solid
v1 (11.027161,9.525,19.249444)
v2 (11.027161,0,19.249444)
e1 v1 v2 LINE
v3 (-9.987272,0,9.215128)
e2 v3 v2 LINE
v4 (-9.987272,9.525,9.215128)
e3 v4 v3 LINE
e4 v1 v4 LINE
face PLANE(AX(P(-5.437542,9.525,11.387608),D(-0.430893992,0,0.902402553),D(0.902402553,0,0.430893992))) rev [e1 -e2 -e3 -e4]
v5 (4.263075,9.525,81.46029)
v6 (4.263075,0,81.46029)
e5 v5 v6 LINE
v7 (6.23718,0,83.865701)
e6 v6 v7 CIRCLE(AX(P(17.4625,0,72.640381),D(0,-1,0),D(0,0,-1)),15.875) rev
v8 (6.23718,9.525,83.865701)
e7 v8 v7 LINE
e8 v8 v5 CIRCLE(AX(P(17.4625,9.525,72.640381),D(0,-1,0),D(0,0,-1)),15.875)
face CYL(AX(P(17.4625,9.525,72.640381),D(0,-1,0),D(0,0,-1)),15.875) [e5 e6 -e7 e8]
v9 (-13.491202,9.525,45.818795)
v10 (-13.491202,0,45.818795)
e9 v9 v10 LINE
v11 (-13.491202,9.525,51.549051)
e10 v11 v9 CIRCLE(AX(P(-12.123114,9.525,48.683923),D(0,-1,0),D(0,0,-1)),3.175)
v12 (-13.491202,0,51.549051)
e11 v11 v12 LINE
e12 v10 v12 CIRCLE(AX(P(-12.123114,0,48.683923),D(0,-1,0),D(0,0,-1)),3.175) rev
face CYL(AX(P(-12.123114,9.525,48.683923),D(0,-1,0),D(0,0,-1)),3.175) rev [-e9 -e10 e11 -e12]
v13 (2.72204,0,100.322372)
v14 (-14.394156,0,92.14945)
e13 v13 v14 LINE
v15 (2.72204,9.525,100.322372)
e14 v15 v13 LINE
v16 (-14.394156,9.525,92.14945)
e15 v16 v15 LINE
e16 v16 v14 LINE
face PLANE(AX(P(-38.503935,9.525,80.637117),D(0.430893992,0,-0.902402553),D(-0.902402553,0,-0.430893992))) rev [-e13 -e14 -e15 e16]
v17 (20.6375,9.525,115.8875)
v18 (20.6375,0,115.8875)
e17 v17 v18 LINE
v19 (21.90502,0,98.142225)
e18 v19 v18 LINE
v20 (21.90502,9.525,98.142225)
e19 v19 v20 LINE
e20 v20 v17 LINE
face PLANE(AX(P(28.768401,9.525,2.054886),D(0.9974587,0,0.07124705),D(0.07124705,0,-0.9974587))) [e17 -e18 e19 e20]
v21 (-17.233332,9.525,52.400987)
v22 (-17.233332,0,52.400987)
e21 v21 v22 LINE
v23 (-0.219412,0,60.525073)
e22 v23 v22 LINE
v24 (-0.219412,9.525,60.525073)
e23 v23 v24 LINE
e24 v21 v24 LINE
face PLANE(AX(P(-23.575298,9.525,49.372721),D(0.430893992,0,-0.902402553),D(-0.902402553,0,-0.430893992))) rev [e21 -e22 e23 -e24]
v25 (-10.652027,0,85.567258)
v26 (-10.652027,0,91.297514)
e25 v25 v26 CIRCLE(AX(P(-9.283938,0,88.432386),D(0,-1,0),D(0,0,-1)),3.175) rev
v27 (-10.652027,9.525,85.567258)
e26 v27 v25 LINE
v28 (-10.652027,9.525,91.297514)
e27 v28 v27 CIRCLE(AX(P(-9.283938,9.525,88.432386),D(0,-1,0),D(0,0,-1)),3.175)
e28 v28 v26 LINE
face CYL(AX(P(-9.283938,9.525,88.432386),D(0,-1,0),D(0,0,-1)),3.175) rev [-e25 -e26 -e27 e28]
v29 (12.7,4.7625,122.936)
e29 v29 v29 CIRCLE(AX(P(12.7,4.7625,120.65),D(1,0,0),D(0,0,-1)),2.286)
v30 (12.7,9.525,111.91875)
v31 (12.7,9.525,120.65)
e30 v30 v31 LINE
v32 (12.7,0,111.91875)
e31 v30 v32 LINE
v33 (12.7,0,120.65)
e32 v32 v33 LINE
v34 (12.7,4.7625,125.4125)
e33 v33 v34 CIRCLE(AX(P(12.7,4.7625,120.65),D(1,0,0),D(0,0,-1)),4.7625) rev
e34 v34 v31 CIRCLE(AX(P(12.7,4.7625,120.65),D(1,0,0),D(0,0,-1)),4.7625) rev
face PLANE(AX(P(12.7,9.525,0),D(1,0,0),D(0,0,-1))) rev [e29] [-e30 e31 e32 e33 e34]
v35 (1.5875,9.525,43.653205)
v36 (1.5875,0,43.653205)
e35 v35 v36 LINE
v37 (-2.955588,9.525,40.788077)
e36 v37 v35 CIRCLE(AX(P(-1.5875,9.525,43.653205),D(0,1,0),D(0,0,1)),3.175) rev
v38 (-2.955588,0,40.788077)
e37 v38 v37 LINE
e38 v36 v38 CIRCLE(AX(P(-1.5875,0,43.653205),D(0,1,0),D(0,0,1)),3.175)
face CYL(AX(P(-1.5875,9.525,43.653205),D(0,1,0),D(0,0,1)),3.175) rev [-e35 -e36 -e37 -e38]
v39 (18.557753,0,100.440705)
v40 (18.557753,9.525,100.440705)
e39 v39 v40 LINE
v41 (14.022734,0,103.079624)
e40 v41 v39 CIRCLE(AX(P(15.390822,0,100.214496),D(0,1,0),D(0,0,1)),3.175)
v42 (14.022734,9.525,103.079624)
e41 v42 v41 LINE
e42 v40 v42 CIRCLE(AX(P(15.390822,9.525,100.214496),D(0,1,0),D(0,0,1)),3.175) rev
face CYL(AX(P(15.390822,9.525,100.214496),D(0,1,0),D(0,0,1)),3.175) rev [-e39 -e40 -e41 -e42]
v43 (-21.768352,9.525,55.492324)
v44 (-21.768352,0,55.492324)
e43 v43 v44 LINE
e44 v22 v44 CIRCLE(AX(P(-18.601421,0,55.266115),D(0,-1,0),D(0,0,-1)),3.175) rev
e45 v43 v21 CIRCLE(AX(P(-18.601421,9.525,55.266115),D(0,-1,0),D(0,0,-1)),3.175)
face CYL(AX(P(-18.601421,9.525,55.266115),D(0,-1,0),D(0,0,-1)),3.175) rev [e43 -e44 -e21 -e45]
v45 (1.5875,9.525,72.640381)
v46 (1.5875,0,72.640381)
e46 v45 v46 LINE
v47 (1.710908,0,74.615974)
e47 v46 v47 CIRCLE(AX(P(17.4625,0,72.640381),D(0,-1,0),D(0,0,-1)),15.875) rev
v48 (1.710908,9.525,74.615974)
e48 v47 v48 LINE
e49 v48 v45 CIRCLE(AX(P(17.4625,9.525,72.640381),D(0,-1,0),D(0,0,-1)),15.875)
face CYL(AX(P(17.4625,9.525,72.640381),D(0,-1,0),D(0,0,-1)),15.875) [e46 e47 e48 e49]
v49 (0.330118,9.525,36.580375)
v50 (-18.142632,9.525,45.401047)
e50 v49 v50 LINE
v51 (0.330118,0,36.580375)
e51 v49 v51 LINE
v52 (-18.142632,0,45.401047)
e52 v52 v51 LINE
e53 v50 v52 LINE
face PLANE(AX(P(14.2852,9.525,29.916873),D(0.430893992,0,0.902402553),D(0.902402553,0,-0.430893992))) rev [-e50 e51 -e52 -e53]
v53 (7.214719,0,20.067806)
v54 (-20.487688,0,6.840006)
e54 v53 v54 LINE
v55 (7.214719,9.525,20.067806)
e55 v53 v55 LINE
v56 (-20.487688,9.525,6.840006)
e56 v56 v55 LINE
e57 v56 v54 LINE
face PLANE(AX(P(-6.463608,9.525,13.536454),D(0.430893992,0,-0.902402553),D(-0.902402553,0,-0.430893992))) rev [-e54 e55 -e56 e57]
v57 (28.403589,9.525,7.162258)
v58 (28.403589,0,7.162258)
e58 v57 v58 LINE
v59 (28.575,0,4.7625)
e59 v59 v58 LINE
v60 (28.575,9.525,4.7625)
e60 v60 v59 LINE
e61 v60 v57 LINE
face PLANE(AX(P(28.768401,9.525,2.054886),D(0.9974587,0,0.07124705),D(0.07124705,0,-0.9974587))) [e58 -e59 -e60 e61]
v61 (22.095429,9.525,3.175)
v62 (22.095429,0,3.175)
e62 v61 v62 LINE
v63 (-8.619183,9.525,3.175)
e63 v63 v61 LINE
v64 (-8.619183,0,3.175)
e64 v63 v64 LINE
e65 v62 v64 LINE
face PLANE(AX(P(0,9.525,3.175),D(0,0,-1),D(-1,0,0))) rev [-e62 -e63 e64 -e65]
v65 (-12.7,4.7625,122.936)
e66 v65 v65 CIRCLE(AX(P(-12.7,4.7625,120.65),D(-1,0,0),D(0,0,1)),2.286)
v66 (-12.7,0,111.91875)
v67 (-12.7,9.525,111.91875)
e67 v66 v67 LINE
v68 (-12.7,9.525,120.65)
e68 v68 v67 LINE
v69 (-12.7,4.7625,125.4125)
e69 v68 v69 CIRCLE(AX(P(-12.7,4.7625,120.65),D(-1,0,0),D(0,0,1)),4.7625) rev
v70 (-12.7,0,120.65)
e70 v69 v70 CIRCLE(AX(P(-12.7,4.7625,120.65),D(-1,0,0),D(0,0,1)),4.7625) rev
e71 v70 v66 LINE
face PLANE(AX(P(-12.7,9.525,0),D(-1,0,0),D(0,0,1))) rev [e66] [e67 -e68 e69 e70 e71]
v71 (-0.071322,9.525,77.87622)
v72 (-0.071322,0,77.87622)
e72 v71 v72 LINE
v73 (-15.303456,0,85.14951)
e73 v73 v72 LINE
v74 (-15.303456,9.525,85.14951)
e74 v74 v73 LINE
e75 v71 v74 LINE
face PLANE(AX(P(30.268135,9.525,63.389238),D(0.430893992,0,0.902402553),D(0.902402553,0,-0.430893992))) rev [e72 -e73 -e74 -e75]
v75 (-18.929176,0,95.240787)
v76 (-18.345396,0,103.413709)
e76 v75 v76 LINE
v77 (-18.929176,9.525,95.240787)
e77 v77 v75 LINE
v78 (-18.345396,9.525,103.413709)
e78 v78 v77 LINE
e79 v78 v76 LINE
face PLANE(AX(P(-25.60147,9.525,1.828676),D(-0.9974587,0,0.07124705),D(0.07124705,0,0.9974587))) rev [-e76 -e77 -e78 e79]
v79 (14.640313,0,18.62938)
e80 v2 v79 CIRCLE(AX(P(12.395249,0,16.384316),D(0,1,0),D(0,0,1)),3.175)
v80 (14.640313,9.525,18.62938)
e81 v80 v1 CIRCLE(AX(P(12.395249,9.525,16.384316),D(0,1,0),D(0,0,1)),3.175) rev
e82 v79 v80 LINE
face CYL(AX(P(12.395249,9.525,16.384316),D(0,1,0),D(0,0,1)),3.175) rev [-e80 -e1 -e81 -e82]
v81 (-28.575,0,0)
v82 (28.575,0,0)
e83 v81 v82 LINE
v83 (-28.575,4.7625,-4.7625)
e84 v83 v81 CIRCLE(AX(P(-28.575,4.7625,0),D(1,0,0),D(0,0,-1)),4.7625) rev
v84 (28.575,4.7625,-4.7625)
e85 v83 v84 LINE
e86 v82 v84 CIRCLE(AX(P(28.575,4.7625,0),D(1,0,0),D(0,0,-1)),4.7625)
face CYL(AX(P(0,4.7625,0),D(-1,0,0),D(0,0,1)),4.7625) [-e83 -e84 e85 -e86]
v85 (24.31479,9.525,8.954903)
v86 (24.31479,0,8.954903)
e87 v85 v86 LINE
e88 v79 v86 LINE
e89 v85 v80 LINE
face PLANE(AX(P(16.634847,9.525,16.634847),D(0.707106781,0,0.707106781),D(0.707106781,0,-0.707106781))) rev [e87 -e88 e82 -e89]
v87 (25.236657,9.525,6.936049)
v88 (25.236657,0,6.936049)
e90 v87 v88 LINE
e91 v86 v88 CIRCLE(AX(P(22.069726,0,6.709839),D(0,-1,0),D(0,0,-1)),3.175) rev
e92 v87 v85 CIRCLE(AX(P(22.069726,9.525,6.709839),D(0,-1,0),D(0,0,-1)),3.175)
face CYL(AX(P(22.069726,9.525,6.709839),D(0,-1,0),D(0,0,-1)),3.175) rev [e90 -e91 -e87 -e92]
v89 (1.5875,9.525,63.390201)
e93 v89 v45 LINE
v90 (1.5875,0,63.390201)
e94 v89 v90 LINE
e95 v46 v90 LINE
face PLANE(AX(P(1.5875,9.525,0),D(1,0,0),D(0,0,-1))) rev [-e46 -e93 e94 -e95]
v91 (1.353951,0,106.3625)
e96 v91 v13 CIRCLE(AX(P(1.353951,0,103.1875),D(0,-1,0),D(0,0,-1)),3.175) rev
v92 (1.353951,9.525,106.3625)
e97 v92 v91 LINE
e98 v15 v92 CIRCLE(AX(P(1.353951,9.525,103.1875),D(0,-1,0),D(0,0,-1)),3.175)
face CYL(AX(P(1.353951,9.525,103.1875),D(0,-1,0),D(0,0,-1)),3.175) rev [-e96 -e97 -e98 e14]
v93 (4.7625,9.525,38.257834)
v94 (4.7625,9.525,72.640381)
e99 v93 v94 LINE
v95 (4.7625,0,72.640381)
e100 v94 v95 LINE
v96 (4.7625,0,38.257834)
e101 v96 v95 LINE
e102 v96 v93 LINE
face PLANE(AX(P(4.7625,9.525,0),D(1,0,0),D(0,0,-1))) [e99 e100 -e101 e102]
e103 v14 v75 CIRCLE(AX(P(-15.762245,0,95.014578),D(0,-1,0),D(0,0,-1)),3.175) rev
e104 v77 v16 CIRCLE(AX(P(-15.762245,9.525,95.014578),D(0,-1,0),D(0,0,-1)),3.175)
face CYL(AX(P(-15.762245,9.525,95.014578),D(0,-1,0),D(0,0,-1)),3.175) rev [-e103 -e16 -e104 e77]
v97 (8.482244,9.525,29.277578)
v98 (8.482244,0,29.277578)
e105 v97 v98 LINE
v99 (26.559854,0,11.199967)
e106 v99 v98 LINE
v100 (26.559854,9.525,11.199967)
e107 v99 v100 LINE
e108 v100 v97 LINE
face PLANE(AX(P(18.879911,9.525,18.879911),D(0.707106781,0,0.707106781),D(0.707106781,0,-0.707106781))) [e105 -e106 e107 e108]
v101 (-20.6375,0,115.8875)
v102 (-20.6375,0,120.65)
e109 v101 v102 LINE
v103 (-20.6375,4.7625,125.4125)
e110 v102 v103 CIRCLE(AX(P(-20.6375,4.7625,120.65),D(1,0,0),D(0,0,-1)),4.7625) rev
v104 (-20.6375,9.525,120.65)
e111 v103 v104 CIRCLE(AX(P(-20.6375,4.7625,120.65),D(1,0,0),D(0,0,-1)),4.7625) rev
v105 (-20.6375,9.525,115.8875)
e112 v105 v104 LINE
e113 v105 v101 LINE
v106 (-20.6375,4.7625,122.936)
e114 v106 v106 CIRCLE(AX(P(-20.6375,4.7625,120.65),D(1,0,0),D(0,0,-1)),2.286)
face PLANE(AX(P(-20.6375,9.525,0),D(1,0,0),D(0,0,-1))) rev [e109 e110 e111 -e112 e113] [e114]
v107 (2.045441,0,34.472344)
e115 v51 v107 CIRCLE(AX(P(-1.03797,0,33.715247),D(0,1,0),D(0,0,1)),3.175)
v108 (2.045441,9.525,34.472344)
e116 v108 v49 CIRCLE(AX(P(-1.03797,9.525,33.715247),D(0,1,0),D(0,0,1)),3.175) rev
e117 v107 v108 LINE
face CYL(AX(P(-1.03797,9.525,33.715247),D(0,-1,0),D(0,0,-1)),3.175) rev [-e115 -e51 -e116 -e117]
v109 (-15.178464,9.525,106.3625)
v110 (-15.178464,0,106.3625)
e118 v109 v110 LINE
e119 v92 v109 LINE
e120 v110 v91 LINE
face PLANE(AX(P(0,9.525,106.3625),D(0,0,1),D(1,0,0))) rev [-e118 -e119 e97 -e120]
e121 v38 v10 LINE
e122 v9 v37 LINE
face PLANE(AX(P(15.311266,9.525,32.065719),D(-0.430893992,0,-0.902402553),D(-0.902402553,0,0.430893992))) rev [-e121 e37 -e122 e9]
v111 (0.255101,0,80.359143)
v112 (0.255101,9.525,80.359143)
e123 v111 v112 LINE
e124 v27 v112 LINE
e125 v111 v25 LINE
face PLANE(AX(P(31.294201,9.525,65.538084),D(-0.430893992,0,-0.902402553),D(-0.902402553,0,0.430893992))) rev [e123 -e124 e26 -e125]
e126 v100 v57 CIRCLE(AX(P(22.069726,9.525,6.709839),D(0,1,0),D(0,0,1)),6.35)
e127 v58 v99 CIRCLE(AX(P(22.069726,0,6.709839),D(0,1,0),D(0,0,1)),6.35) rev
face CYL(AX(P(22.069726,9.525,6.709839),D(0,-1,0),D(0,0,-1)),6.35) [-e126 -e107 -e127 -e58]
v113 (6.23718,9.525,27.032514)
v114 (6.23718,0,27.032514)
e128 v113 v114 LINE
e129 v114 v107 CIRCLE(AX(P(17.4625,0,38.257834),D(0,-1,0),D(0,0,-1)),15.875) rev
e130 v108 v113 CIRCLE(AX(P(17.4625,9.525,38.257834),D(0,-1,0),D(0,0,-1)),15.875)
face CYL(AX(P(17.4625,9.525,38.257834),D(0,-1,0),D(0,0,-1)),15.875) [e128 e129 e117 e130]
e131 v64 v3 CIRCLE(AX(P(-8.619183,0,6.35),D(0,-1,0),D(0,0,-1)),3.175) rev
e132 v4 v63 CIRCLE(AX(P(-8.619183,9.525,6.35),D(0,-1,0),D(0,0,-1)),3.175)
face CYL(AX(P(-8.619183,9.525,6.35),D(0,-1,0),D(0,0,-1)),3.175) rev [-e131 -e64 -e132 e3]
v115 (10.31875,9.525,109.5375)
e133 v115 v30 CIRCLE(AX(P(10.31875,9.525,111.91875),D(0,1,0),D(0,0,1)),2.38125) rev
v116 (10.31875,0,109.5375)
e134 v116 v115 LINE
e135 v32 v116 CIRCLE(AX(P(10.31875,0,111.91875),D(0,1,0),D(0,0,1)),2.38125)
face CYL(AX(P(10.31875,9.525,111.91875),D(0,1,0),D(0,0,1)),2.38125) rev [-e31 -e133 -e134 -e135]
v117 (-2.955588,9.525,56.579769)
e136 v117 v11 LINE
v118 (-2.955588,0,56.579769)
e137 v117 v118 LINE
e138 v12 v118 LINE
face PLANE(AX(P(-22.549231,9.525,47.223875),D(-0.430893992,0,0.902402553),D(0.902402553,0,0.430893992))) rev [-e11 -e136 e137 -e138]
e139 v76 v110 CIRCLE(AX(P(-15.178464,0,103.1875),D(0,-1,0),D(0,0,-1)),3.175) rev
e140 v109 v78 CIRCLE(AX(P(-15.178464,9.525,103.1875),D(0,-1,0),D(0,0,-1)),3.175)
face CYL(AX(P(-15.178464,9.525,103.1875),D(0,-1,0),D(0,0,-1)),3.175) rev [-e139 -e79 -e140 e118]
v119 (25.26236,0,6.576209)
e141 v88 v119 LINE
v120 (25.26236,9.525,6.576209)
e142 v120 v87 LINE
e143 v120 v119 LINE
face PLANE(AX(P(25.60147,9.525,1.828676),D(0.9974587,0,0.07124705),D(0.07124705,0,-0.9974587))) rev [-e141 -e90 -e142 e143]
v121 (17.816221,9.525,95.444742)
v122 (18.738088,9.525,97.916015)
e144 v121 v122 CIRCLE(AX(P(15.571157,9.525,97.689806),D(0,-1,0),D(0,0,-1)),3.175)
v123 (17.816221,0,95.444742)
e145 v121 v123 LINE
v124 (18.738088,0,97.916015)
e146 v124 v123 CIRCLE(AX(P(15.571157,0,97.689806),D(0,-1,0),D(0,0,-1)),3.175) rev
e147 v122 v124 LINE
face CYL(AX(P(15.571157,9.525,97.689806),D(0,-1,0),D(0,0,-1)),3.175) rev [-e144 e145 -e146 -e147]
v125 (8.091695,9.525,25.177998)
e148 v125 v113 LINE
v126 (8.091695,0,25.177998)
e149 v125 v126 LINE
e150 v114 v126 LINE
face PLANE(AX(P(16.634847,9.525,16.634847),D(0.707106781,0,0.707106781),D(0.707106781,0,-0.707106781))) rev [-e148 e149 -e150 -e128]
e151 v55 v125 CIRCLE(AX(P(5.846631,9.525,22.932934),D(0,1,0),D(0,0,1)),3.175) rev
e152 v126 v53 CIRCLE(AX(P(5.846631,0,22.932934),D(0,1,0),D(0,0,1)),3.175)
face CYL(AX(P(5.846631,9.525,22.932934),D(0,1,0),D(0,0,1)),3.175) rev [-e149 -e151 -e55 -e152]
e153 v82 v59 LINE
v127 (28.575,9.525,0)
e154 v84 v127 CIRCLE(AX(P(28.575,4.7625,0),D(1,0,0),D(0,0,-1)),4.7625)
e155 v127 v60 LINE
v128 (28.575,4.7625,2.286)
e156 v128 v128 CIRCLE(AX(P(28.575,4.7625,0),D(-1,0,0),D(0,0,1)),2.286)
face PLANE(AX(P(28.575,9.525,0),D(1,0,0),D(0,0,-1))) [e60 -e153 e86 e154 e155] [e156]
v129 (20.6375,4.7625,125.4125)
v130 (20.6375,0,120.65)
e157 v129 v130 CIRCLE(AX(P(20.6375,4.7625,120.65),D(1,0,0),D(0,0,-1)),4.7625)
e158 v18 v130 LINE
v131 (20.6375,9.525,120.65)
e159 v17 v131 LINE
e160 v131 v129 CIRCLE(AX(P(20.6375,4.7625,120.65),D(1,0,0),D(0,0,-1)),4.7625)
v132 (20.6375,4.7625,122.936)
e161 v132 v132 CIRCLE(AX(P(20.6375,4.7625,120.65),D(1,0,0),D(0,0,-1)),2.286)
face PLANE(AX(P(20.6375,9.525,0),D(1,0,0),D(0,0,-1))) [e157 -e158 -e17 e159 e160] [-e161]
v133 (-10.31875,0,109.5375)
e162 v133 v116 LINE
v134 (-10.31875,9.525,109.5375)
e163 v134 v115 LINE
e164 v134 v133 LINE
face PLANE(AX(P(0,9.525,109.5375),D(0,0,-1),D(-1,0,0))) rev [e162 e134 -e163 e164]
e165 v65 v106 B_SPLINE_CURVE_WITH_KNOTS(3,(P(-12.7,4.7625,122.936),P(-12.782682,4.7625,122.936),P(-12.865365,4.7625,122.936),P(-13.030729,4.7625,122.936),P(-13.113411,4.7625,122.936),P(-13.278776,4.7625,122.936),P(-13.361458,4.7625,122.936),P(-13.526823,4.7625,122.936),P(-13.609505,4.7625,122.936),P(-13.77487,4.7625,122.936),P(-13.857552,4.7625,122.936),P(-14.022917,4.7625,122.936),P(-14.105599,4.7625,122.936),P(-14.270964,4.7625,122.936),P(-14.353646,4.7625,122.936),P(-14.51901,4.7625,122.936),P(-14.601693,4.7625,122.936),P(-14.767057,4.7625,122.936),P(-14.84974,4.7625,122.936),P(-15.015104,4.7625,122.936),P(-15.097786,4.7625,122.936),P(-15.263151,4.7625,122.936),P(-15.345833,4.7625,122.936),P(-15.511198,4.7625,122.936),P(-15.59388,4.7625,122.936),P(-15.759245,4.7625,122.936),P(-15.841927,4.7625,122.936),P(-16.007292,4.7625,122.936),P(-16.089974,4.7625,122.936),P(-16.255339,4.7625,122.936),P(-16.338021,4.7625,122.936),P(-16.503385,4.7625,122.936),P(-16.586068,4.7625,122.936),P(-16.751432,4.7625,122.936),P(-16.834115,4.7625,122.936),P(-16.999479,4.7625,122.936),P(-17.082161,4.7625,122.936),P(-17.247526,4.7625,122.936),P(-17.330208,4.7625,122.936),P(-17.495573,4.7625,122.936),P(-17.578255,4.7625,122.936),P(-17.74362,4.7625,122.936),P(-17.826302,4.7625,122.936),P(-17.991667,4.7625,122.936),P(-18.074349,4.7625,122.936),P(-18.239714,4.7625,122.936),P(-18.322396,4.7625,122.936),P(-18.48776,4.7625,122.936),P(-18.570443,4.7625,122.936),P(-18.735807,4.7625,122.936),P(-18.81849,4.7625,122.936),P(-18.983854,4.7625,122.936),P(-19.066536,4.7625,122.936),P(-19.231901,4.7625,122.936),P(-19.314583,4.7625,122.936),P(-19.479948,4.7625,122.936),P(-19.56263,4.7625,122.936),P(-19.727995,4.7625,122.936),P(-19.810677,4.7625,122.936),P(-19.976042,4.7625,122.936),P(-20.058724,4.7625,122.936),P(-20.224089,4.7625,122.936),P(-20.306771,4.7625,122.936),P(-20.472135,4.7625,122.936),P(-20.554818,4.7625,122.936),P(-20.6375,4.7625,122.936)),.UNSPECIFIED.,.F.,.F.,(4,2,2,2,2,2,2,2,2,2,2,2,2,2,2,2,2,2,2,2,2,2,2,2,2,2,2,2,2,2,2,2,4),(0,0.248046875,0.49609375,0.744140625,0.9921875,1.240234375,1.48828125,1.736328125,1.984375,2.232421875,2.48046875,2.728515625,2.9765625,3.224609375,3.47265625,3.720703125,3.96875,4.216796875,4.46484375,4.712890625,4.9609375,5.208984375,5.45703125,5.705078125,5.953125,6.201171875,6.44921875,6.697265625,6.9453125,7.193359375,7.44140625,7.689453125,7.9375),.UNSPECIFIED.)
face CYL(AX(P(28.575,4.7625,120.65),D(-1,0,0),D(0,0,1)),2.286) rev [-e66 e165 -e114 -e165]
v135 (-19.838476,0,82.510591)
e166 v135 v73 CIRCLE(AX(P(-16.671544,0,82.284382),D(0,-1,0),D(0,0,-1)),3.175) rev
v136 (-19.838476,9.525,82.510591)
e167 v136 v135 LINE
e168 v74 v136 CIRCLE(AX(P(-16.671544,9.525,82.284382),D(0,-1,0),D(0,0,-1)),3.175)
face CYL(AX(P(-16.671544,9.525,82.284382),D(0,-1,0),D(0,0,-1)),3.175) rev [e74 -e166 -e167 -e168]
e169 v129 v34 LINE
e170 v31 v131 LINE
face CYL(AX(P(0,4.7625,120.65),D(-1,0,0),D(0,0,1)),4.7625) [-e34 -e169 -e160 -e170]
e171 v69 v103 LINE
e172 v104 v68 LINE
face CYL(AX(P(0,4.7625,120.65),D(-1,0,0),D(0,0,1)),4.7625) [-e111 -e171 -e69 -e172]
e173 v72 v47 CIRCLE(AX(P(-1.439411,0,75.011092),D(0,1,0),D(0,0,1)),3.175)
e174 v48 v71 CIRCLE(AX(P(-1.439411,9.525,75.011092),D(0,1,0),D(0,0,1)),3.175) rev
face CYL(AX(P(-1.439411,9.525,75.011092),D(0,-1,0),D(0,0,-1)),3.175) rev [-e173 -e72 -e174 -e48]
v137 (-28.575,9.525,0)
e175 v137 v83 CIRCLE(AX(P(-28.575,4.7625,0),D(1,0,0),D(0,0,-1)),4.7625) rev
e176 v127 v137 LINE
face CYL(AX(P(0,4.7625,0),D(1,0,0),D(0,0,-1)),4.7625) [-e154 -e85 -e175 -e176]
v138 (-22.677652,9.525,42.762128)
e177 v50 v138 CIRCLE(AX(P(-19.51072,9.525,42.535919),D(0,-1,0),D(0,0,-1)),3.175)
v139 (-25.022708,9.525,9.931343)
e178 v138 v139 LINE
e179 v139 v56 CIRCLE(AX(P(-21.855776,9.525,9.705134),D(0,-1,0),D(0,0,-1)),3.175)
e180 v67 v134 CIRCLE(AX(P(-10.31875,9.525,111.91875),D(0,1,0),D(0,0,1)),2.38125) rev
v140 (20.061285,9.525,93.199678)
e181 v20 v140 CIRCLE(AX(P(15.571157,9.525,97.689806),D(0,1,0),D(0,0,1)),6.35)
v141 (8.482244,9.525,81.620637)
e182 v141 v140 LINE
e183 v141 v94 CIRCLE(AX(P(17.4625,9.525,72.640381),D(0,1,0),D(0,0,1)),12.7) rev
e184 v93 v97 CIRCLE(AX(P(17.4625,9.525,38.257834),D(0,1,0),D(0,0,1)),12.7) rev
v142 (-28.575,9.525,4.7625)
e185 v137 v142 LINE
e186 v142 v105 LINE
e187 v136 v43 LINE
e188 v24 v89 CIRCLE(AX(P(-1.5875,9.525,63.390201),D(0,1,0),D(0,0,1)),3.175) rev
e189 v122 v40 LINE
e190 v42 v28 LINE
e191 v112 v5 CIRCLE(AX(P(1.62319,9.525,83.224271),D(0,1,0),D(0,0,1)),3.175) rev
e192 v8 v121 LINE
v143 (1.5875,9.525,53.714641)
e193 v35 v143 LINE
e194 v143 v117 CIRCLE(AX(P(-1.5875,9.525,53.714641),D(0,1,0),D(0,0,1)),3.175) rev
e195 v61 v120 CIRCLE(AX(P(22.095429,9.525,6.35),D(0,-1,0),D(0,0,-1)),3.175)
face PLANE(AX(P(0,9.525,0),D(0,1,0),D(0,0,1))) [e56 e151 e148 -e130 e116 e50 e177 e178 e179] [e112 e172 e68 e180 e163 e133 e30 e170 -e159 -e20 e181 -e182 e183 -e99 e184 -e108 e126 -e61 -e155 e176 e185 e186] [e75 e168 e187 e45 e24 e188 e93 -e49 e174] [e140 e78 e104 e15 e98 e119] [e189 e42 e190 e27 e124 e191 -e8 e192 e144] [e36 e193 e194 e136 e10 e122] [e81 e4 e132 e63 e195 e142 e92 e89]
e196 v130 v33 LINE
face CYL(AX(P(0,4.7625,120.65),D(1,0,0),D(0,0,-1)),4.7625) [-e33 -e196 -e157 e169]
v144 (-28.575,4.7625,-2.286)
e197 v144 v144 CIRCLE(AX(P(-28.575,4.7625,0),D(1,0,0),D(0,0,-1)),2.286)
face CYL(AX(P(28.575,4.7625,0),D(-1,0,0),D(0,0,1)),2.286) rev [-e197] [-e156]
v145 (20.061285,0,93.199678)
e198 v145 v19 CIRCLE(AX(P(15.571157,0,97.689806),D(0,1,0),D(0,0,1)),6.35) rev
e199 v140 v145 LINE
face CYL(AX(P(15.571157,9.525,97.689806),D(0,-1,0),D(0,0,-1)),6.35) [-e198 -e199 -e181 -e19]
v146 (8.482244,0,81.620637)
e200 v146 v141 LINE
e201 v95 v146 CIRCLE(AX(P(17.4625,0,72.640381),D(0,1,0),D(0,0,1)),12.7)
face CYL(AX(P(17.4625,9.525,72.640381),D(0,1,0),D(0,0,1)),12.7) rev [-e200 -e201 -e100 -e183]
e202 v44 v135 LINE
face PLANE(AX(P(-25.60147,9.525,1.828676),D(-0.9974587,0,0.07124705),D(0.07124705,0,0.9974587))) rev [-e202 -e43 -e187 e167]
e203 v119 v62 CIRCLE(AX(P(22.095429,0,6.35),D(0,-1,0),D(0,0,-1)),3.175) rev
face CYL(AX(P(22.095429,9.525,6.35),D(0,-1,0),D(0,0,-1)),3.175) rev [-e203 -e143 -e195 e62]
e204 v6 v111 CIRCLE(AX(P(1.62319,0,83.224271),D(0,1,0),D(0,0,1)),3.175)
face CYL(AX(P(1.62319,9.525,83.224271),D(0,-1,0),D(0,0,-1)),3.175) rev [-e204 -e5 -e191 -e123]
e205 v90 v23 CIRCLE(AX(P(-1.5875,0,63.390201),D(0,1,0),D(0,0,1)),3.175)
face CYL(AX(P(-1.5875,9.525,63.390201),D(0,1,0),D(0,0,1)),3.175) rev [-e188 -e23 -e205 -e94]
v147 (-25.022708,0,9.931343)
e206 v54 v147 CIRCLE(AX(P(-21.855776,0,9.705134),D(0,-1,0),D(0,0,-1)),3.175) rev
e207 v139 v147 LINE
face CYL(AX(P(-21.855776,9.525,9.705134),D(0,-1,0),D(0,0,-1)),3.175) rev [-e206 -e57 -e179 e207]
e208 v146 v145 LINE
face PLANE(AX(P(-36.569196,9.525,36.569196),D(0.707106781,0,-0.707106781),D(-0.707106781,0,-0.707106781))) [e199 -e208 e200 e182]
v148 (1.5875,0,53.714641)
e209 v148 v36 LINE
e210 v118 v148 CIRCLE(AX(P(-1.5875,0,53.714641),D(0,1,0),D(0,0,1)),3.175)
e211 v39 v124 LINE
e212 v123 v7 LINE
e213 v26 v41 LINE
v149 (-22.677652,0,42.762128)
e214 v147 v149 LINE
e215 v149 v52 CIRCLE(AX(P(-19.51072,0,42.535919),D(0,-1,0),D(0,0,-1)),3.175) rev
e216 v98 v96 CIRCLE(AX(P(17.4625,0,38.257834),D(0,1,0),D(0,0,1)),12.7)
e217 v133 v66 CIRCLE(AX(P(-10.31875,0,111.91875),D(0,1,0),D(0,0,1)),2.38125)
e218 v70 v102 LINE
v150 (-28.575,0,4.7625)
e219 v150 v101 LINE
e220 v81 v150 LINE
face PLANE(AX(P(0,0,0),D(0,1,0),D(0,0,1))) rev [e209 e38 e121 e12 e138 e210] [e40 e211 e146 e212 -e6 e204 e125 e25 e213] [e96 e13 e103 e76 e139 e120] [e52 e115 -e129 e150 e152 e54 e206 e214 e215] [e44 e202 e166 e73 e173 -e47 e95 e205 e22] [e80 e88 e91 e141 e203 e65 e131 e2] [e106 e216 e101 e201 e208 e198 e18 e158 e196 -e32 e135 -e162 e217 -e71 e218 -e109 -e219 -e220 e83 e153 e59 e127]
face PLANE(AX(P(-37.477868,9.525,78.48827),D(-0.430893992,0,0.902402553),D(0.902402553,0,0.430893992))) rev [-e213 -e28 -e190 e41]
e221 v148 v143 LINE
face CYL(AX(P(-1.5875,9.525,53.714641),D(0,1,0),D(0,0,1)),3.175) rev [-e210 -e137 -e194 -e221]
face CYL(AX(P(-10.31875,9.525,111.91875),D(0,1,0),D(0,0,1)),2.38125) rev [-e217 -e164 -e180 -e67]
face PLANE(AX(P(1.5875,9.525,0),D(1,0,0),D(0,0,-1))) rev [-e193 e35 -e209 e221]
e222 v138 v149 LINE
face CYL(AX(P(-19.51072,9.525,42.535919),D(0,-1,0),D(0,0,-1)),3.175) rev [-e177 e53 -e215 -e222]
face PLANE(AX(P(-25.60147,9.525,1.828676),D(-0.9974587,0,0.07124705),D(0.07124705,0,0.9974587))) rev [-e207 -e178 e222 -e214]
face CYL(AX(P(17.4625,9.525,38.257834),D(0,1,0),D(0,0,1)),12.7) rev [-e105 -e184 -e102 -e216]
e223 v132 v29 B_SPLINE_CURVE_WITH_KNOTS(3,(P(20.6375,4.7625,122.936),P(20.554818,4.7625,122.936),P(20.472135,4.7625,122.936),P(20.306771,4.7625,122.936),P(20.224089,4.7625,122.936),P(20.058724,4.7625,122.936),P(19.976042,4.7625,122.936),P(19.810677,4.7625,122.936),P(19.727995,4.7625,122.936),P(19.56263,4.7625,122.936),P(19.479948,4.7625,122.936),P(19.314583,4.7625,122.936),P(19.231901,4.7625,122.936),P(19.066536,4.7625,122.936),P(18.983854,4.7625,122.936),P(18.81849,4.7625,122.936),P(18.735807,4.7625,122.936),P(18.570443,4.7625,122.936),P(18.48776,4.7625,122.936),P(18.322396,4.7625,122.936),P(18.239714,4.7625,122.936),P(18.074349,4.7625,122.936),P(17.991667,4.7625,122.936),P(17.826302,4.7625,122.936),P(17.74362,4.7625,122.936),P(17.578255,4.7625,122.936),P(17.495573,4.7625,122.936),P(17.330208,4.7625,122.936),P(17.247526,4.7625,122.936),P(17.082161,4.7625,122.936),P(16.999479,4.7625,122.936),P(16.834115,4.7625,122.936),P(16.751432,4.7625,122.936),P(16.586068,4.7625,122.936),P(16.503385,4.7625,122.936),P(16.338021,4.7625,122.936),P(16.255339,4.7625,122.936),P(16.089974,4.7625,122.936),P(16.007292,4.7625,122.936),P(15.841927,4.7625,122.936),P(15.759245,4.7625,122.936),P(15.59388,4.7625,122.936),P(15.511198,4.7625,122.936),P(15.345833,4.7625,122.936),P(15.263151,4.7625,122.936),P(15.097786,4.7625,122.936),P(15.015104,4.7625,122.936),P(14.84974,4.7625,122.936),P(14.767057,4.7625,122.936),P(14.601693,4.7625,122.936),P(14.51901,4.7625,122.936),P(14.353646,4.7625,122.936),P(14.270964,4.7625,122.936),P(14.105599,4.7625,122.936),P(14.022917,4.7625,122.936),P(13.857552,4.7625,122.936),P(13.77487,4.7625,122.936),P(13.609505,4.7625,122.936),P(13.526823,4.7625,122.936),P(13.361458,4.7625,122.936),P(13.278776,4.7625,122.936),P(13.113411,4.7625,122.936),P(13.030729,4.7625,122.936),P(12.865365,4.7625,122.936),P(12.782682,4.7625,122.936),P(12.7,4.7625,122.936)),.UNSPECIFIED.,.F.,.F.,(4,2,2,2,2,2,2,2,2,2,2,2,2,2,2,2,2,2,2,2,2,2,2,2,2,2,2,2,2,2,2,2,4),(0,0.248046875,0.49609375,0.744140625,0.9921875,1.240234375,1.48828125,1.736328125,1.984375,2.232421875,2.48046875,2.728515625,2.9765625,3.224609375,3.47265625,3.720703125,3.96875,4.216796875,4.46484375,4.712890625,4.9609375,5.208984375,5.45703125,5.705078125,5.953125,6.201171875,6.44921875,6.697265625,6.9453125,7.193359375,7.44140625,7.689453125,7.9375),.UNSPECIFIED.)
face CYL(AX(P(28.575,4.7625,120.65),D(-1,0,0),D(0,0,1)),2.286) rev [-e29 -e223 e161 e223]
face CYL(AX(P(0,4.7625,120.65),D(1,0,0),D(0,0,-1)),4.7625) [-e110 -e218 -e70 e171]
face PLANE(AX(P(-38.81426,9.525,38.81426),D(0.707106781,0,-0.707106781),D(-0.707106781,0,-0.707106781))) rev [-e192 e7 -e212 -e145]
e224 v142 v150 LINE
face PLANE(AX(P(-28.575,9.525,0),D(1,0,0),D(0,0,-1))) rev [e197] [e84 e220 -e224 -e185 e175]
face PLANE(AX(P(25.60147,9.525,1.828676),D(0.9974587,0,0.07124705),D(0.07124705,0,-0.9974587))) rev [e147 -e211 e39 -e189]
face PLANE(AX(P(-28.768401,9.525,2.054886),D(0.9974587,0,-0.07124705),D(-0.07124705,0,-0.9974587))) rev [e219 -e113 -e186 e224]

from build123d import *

# Parameters (mm, degrees)
BOSS_EXTRUDE1_DEPTH     = 9.525
CUT_EXTRUDE2_DEPTH      = 139.148989433
CUT_EXTRUDE2_DEPTH_BACK = 139.148989433
SKETCH6_R               = 2.286
FILLET5_R               = 4.7625
FILLET6_R               = 12.7
FILLET7_R               = 6.35
CUT_EXTRUDE3_DEPTH      = 129.978879691
CUT_EXTRUDE3_DEPTH_BACK = 129.978879691
FILLET8_R               = 3.175
FILLET9_R               = 2.38125


# Some blends are built 0.0001 mm under size
with BuildPart() as part:
    # Sketch1 → Boss-Extrude1 (new body)
    with BuildSketch(Plane(origin=(0, 0, 0), x_dir=(1, 0, 0), z_dir=(0, 1, 0))):
        Polygon((-28.575, 4.7625), (-28.575, -4.7625), (-20.6375, -115.8875), (-20.6375, -125.4125), (-12.7, -125.4125), (-12.7, -109.5375), (12.7, -109.5375), (12.7, -125.4125), (20.6375, -125.4125), (20.6375, -115.8875), (22.111607143, -95.25), (4.7625, -77.900892857), (4.7625, -32.997321429), (28.234821429, -9.525), (28.575, -4.7625), (28.575, 4.7625), align=None)
    extrude(amount=BOSS_EXTRUDE1_DEPTH)

    # Sketch6 → Cut-Extrude2 (cut, two sides: drawn at the far end of the back side and taken through both)
    with BuildSketch(Plane.ZY.offset(28.575).offset(-CUT_EXTRUDE2_DEPTH_BACK)):
        with Locations((0, 4.7625)):
            Circle(SKETCH6_R)
        with Locations((120.65, 4.7625)):
            Circle(SKETCH6_R)
    extrude(amount=CUT_EXTRUDE2_DEPTH + CUT_EXTRUDE2_DEPTH_BACK, mode=Mode.SUBTRACT)

    # Fillet5
    fillet5_edges = [part.edges().sort_by_distance(p)[0] for p in [
        (0, 0, -4.7625),
        (0, 9.525, -4.7625),
        (16.66875, 0, 125.4125),
        (16.66875, 9.525, 125.4125),
        (-16.66875, 0, 125.4125),
        (-16.66875, 9.525, 125.4125),
    ]]
    fillet(fillet5_edges, radius=FILLET5_R - 0.0001)  # a hair under: the kernel refuses the full size

    # Fillet6
    fillet6_edges = [part.edges().sort_by_distance(p)[0] for p in [
        (4.7625, 4.7625, 32.997321429),
        (4.7625, 4.7625, 77.900892857),
    ]]
    fillet(fillet6_edges, radius=FILLET6_R)

    # Fillet7
    fillet7_edges = [part.edges().sort_by_distance(p)[0] for p in [
        (28.234821429, 4.7625, 9.525),
        (22.111607143, 4.7625, 95.25),
    ]]
    fillet(fillet7_edges, radius=FILLET7_R)

    # Sketch7 → Cut-Extrude3 (cut, two sides: drawn at the far end of the back side and taken through both)
    with BuildSketch(Plane.XZ.offset(-CUT_EXTRUDE3_DEPTH_BACK)):
        with BuildLine():
            ThreePointArc((-15.178464487, 106.3625), (-17.342073764, 105.511165186), (-18.345395859, 103.413709384))
            Line((-18.345395859, 103.413709384), (-18.929176024, 95.240787072))
            ThreePointArc((-18.929176024, 95.240787072), (-17.550554149, 92.391111633), (-14.394156229, 92.149449581))
            Line((-14.394156229, 92.149449581), (2.722039645, 100.322371894))
            ThreePointArc((2.722039645, 100.322371894), (4.450514376, 103.888871251), (1.353951221, 106.3625))
            Line((1.353951221, 106.3625), (-15.178464487, 106.3625))
        make_face()
        with BuildLine():
            Line((-10.652026542, 85.567257834), (2.949065003, 79.072785266))
            ThreePointArc((2.949065003, 79.072785266), (4.371896924, 81.621011779), (6.237179849, 83.865700766))
            Line((6.237179849, 83.865700766), (17.816220953, 95.444741871))
            ThreePointArc((17.816220953, 95.444741871), (18.545921053, 96.580119743), (18.738088295, 97.916015285))
            Line((18.738088295, 97.916015285), (18.355750526, 103.268744039))
            ThreePointArc((18.355750526, 103.268744039), (16.767104452, 103.883635913), (15.089301508, 103.588906124))
            Line((15.089301508, 103.588906124), (-10.652026542, 91.297514046))
            ThreePointArc((-10.652026542, 91.297514046), (-12.458938118, 88.43238594), (-10.652026542, 85.567257834))
        make_face()
        with BuildLine():
            ThreePointArc((-15.303455952, 85.149509664), (-18.268395024, 85.028592375), (-19.838475748, 82.510590942))
            Line((-19.838475748, 82.510590942), (-21.768351953, 55.492324069))
            ThreePointArc((-21.768351953, 55.492324069), (-20.389730078, 52.642648631), (-17.233332157, 52.400986579))
            Line((-17.233332157, 52.400986579), (1.5875, 61.38786662))
            Line((1.5875, 61.38786662), (1.5875, 72.640380615))
            ThreePointArc((1.5875, 72.640380615), (1.727944926, 74.747369375), (2.146794694, 76.817077393))
            Line((2.146794694, 76.817077393), (-15.303455952, 85.149509664))
        make_face()
        with BuildLine():
            Line((1.5875, 38.618768332), (1.5875, 58.749077544))
            Line((1.5875, 58.749077544), (-13.49120247, 51.549051044))
            ThreePointArc((-13.49120247, 51.549051044), (-15.298114047, 48.683922938), (-13.49120247, 45.818794832))
            Line((-13.49120247, 45.818794832), (1.5875, 38.618768332))
        make_face()
        with BuildLine():
            ThreePointArc((-18.142631881, 45.401046662), (-21.107570953, 45.280129373), (-22.677651676, 42.76212794))
            Line((-22.677651676, 42.76212794), (-25.022707709, 9.93134348))
            ThreePointArc((-25.022707709, 9.93134348), (-23.644085834, 7.081668041), (-20.487687914, 6.84000599))
            Line((-20.487687914, 6.84000599), (11.26695768, 22.002735688))
            Line((11.26695768, 22.002735688), (6.237179849, 27.032513519))
            ThreePointArc((6.237179849, 27.032513519), (3.290050222, 31.105401057), (1.764238406, 35.895587299))
            Line((1.764238406, 35.895587299), (-18.142631881, 45.401046662))
        make_face()
        with BuildLine():
            ThreePointArc((-9.987271687, 9.215128106), (-11.715746418, 5.648628749), (-8.619183264, 3.175))
            Line((-8.619183264, 3.175), (22.095428773, 3.175))
            ThreePointArc((22.095428773, 3.175), (24.419093959, 4.186390723), (25.262360145, 6.576209384))
            Line((25.262360145, 6.576209384), (25.236657334, 6.936048729))
            ThreePointArc((25.236657334, 6.936048729), (24.957868459, 8.028648627), (24.314789993, 8.954903375))
            Line((24.314789993, 8.954903375), (13.052944458, 20.21674891))
            Line((13.052944458, 20.21674891), (-9.987271687, 9.215128106))
        make_face()
    extrude(amount=CUT_EXTRUDE3_DEPTH + CUT_EXTRUDE3_DEPTH_BACK, mode=Mode.SUBTRACT)

    # Fillet8
    # the kernel refuses this fillet: 3.175 mm, written as the material it adds along each edge
    with BuildSketch(Plane(origin=(2.146794694, 0, 76.817077393), x_dir=(-0.19425863373245403, 0, -0.9809503469699169), z_dir=(0, 1, 0))) as fillet8_piece_1:
        with BuildLine():
            CenterArc((2.468233166, 3.167061169), FILLET8_R, 194.322890181, 71.624501931)
            Line((-0.608078232, 2.381610227), (0, 0))
            ThreePointArc((0, 0), (1.121924166, 0.039694156), (2.243848333, 0))
        make_face()
    extrude(amount=9.525)
    with BuildSketch(Plane(origin=(1.5875, 0, 61.38786662), x_dir=(0, 0, 1), z_dir=(0, 1, 0))) as fillet8_piece_2:
        with BuildLine():
            CenterArc((FILLET8_R * 0.630656469631, -FILLET8_R), FILLET8_R, 90, 64.475691518)
            Line((-FILLET8_R * 0.271746083545, -FILLET8_R * 0.569106008372), (0, 0))
            Line((0, 0), (FILLET8_R * 0.630656469631, 0))
        make_face()
    extrude(amount=9.525)
    with BuildSketch(Plane(origin=(2.949065003, 9.525, 79.072785266), x_dir=(0.482167275870273, 0, 0.8760791734083397), z_dir=(0, -1, 0))) as fillet8_piece_3:
        with BuildLine():
            CenterArc((2.997736865, 3.163282633), FILLET8_R, 183.302737657, 81.773303175)
            Line((-0.171989666, 2.980365394), (0, 0))
            ThreePointArc((0, 0), (1.362607666, 0.058586837), (2.725215332, 0))
        make_face()
    extrude(amount=9.525)
    with BuildSketch(Plane(origin=(18.355750526, 0, 103.268744039), x_dir=(-0.9990488574203268, 0, -0.04360482183359276), z_dir=(0, 1, 0))) as fillet8_piece_4:
        with BuildLine():
            CenterArc((3.095288472, -2.922058213), FILLET8_R, 66.97485618, 111.438691702)
            Line((-0.078494517, -2.834157465), (-0.395872815, -2.82536739))
            Line((-0.395872815, -2.82536739), (-0.317378299, 0.008790075))
            Line((-0.317378299, 0.008790075), (-0.200752777, 0.245976772))
            ThreePointArc((-0.200752777, 0.245976772), (3.373566927, 0.754496314), (4.461327625, 0.292205821))
            Line((4.461327625, 0.292205821), (4.337142248, 0))
        make_face()
    extrude(amount=9.525)
    with BuildSketch(Plane(origin=(1.764238406, 9.525, 35.895587299), x_dir=(-0.9024025531760991, 0, 0.4308939916281702), z_dir=(0, -1, 0))) as fillet8_piece_5:
        with BuildLine():
            CenterArc((1.589224556, 3.175), FILLET8_R, 219.319739753, 50.680260247)
            ThreePointArc((-0.867025133, 1.163169374), (-0.420218411, 0.591494135), (0, 0))
            Line((0, 0), (1.589224556, 0))
        make_face()
    extrude(amount=9.525)
    with BuildSketch(Plane(origin=(11.26695768, 9.525, 22.002735688), x_dir=(-0.7071067811865471, 0, 0.7071067811865479), z_dir=(0, -1, 0))) as fillet8_piece_6:
        with BuildLine():
            CenterArc((FILLET8_R * 1.4143306163, FILLET8_R), FILLET8_R, 160.524308482, 109.475691518)
            Line((FILLET8_R * 0.471547588134, FILLET8_R * 1.33340690126), (0, 0))
            Line((0, 0), (FILLET8_R * 1.4143306163, 0))
        make_face()
    extrude(amount=9.525)
    with BuildSketch(Plane(origin=(1.5875, 0, 58.749077544), x_dir=(-0.9024025531760999, 0, -0.4308939916281688), z_dir=(0, 1, 0))) as fillet8_piece_7:
        with BuildLine():
            CenterArc((FILLET8_R * 1.58564931647, -FILLET8_R), FILLET8_R, 90, 115.524308482)
            Line((FILLET8_R * 0.683246763298, -FILLET8_R * 1.43089399163), (0, 0))
            Line((0, 0), (FILLET8_R * 1.58564931647, 0))
        make_face()
    extrude(amount=9.525)
    with BuildSketch(Plane(origin=(1.5875, 9.525, 38.618768332), x_dir=(0, 0, 1), z_dir=(0, -1, 0))) as fillet8_piece_8:
        with BuildLine():
            CenterArc((FILLET8_R * 1.58564931647, FILLET8_R), FILLET8_R, 154.475691518, 115.524308482)
            Line((FILLET8_R * 0.683246763298, FILLET8_R * 1.43089399163), (0, 0))
            Line((0, 0), (FILLET8_R * 1.58564931647, 0))
        make_face()
    extrude(amount=9.525)
    with BuildSketch(Plane(origin=(13.052944458, 9.525, 20.21674891), x_dir=(-0.9024025531761012, 0, -0.4308939916281661), z_dir=(0, -1, 0))) as fillet8_piece_9:
        with BuildLine():
            CenterArc((FILLET8_R * 0.707048259068, FILLET8_R), FILLET8_R, 199.475691518, 70.524308482)
            Line((-FILLET8_R * 0.235734769096, FILLET8_R * 0.666593098742), (0, 0))
            Line((0, 0), (FILLET8_R * 0.707048259068, 0))
        make_face()
    extrude(amount=9.525)

    # Fillet9
    fillet9_edges = [part.edges().sort_by_distance(p)[0] for p in [
        (12.7, 4.7625, 109.5375),
        (-12.7, 4.7625, 109.5375),
    ]]
    fillet(fillet9_edges, radius=FILLET9_R)


solid = part.part
